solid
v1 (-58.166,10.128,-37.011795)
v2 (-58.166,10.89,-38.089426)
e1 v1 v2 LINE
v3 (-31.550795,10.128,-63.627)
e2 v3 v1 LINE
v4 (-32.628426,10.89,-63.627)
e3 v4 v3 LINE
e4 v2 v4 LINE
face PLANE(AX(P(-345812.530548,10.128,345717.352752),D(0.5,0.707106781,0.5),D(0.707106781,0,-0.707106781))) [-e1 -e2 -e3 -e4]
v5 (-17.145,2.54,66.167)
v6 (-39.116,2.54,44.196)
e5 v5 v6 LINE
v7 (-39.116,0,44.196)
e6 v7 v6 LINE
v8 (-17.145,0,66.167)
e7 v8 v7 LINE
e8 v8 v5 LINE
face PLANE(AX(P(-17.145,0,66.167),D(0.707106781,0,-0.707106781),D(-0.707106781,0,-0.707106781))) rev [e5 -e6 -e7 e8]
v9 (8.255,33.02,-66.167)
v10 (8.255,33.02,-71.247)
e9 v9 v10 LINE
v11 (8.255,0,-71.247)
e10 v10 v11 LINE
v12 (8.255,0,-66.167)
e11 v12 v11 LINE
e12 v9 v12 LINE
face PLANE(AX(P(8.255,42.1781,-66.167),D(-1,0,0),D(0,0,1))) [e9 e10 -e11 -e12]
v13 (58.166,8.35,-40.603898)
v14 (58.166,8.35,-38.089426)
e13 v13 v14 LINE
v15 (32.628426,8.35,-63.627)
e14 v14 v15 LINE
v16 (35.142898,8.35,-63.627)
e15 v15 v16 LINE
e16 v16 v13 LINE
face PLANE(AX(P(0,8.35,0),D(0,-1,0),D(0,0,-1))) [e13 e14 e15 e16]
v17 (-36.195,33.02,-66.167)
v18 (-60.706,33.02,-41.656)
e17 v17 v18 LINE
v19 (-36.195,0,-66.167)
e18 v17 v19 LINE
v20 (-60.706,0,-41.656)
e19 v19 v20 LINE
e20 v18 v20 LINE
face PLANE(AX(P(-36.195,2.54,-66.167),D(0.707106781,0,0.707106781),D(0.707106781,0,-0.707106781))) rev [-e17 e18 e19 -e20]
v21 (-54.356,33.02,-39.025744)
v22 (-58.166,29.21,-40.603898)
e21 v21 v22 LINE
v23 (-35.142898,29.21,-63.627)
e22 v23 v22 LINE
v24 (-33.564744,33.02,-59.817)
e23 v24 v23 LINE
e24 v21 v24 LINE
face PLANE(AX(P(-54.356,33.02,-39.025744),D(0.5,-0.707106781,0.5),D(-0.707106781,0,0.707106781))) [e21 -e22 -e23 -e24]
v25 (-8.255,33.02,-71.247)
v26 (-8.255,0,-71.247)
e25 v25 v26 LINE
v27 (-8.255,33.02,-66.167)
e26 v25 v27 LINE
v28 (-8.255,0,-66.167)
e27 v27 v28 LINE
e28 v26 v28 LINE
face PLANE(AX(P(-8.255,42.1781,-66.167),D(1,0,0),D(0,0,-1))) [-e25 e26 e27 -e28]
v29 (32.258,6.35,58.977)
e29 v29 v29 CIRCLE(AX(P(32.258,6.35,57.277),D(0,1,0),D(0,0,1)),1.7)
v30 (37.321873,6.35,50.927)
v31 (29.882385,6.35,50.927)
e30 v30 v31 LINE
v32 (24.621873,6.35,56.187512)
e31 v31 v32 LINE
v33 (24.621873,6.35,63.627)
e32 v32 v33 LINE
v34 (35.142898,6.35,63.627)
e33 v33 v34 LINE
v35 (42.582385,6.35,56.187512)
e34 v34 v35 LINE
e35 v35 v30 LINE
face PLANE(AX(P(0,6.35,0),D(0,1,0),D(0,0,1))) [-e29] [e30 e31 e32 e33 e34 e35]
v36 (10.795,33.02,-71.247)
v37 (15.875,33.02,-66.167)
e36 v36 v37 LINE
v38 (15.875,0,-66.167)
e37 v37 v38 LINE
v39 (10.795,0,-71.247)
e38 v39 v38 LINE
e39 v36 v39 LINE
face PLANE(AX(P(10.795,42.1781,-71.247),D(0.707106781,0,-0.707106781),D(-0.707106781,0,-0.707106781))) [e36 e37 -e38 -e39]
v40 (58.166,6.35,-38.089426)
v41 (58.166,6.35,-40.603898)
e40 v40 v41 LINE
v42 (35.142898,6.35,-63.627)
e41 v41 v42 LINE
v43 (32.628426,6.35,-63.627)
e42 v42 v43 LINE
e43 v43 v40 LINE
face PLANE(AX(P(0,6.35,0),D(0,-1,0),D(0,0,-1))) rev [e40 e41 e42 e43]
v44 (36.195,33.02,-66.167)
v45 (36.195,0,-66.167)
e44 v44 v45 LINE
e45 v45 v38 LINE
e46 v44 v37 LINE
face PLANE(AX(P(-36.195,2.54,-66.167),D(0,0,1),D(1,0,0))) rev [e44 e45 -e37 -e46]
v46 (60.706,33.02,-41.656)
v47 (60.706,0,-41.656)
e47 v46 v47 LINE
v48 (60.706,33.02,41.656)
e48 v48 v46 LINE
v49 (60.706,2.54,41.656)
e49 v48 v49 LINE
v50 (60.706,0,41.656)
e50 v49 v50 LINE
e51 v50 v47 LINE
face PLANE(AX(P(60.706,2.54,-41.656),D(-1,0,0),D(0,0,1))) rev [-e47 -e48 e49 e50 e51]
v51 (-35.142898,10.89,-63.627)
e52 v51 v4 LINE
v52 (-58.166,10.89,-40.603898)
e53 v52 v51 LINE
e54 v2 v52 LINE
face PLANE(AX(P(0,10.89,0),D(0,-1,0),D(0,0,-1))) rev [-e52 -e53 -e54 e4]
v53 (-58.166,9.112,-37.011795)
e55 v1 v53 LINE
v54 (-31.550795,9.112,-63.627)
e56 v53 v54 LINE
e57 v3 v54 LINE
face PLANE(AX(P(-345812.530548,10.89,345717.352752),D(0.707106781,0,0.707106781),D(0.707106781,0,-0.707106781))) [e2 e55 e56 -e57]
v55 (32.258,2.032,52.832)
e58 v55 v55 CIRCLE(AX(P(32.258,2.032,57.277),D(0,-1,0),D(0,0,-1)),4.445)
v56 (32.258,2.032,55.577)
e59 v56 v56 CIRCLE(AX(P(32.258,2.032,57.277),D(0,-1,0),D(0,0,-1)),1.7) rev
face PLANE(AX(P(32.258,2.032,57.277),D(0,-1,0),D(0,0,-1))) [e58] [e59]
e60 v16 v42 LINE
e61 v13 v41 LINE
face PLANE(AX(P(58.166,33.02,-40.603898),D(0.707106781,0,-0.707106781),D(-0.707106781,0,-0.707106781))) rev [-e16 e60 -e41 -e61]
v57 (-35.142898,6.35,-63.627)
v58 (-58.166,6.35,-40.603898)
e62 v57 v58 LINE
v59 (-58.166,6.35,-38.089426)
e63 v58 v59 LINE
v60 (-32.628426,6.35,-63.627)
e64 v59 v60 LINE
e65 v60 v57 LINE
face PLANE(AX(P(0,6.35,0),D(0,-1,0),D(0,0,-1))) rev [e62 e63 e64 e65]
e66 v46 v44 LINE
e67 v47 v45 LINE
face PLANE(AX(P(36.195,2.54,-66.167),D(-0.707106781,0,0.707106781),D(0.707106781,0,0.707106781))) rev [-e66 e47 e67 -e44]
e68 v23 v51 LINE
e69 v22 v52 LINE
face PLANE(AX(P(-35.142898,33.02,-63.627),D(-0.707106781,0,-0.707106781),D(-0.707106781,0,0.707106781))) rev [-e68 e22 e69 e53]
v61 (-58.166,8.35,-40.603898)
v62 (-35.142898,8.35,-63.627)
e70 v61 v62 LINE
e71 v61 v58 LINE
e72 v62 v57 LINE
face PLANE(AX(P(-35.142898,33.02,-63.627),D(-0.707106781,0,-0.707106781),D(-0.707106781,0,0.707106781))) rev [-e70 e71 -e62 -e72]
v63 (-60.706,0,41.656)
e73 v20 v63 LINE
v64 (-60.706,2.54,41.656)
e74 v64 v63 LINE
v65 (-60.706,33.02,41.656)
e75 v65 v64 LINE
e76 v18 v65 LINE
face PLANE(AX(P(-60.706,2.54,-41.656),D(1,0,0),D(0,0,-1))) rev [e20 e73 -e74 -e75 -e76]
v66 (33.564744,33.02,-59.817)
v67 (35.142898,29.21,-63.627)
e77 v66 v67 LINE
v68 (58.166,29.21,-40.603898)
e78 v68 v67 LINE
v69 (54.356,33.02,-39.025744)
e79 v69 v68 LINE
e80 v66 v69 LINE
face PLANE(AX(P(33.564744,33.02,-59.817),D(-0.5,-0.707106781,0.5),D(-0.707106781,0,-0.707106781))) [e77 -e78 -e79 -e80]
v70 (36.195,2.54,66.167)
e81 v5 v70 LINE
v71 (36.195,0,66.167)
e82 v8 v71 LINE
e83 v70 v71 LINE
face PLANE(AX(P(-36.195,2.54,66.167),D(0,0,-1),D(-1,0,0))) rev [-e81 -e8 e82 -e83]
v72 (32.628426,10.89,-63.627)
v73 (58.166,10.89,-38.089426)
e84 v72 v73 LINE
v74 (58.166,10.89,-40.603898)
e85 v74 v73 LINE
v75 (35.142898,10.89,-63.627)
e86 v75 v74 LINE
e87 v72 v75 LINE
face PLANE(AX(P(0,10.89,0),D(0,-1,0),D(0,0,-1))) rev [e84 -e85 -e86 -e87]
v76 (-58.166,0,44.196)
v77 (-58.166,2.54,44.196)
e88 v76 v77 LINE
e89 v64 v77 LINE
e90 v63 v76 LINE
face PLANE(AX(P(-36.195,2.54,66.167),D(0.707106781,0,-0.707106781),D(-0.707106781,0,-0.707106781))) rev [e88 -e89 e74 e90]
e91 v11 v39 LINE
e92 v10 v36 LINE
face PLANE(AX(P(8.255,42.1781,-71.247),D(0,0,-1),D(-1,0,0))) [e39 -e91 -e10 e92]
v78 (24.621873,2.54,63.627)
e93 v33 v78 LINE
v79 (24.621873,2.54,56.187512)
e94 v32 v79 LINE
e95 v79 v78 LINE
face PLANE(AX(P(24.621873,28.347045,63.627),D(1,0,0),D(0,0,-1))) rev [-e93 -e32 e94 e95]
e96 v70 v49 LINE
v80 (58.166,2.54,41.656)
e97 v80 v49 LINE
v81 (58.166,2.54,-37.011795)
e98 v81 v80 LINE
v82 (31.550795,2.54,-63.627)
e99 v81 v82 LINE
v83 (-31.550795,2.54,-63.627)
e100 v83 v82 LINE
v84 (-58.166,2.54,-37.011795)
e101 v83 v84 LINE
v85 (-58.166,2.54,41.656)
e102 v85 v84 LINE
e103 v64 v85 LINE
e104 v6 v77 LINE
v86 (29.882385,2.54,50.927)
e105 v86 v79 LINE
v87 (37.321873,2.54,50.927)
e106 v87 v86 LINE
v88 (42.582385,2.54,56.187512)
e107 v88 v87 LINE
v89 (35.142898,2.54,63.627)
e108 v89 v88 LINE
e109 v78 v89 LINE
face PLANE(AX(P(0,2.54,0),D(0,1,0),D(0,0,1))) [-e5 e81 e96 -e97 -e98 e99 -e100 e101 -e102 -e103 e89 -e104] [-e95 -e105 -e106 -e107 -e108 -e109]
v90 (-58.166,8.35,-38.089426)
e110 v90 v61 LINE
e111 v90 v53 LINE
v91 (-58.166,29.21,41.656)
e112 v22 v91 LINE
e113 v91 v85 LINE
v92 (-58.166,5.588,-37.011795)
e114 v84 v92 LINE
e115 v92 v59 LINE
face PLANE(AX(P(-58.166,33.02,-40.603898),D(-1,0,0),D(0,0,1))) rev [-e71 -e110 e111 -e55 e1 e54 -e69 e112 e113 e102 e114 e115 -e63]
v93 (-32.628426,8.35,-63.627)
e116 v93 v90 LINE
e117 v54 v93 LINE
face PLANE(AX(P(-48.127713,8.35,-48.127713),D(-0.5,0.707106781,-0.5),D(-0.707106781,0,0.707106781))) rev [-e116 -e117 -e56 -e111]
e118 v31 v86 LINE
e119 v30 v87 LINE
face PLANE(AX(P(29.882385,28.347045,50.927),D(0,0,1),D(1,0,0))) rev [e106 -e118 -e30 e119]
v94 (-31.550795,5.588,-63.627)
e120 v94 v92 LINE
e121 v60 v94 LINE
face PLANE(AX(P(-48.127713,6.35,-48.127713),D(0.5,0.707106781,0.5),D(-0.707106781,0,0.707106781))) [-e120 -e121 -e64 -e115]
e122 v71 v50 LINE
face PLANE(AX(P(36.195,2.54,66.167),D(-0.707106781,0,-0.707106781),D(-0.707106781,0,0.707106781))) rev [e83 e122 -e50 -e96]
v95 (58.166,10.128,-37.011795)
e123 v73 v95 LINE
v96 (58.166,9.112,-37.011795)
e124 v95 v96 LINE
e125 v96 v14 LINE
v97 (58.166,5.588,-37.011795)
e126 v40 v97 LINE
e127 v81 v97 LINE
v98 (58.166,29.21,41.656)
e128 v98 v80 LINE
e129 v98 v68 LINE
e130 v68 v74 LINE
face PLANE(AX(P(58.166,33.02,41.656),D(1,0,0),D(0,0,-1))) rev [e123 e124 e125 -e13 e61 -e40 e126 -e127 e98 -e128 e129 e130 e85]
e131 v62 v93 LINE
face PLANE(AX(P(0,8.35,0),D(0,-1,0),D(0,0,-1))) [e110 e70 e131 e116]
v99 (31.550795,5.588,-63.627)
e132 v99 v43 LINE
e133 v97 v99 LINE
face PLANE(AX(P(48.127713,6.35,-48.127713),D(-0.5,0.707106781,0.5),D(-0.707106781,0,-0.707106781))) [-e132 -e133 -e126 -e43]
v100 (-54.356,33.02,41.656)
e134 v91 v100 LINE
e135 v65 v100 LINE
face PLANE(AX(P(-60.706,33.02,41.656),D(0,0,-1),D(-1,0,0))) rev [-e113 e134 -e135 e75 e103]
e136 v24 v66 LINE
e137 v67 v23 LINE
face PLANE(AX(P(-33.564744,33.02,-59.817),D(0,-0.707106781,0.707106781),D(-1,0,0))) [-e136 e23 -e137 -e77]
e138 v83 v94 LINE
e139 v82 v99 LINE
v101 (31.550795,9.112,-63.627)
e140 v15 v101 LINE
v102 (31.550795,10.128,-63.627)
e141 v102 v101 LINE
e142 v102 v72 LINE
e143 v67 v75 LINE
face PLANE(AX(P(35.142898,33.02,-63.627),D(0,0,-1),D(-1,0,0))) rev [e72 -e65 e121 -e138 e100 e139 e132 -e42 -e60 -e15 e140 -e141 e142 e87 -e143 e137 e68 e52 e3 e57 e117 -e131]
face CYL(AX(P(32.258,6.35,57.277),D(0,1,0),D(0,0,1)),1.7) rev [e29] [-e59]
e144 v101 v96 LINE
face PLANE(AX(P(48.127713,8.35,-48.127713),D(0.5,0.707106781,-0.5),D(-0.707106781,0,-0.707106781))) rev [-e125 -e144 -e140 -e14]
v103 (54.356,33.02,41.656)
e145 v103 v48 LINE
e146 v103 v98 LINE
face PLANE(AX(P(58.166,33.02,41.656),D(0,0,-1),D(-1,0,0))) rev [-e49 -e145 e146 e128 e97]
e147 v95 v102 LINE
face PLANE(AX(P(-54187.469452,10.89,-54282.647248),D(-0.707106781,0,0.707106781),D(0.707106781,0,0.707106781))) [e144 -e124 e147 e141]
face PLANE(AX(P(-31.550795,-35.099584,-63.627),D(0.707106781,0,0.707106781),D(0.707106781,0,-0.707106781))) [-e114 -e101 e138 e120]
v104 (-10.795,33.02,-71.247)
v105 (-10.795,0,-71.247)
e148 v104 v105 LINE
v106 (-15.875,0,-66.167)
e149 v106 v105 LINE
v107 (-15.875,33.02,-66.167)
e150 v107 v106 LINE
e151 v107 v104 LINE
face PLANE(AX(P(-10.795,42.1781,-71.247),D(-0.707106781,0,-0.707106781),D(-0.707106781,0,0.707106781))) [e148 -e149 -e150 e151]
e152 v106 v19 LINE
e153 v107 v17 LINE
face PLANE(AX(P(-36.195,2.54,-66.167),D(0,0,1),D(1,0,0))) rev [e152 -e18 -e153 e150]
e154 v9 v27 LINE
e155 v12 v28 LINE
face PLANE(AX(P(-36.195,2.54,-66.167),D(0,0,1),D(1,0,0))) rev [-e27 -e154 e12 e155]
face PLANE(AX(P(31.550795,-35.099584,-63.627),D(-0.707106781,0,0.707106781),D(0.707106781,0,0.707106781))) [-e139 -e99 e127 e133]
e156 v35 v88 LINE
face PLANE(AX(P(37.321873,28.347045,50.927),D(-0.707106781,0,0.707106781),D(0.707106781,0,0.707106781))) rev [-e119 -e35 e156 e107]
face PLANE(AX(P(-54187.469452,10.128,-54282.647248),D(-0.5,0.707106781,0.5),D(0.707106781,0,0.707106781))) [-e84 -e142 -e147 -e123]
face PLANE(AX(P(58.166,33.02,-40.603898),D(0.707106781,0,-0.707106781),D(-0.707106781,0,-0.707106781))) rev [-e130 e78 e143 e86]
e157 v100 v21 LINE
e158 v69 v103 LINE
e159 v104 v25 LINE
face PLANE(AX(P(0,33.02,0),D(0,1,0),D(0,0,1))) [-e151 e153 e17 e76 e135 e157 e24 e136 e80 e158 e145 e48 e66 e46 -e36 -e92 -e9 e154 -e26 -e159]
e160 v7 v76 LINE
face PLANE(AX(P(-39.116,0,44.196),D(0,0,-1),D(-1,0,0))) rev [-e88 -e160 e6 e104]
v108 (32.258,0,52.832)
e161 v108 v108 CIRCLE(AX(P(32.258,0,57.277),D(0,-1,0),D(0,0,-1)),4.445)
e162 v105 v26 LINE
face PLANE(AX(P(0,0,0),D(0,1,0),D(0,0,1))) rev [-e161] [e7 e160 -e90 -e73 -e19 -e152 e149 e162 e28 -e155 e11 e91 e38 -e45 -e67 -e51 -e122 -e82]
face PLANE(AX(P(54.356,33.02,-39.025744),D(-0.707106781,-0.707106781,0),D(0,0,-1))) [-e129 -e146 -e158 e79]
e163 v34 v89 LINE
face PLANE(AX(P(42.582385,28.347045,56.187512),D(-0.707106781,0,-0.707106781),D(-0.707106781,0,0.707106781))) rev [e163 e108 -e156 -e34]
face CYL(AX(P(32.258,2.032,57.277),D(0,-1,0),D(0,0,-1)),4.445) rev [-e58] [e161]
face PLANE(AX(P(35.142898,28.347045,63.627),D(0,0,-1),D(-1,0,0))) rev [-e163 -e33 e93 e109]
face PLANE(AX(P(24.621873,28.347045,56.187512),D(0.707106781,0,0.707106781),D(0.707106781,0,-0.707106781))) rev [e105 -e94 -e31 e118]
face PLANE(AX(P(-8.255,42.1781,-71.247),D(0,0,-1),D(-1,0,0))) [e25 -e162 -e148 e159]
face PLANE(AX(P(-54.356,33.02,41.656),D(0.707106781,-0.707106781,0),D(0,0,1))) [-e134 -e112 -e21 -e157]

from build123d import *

# Parameters (mm, degrees)
BOSS_EXTRUDE1_DEPTH  = 2.54
BOSS_EXTRUDE2_DEPTH  = 30.48
CUT_EXTRUDE2_DEPTH   = 95.827847835
BOSS_EXTRUDE4_DEPTH  = 3.81
BOSS_EXTRUDE5_START  = 2
BOSS_EXTRUDE5_DEPTH  = 2.54
CHAMFER4_SIZE        = 0.762
BOSS_EXTRUDE6_DEPTH  = 3.81
M3_CLEARANCE_HOLE1_D = 3.4
SKETCH13_R           = 4.445
CUT_EXTRUDE3_DEPTH   = 2.032
BOSS_EXTRUDE3_DEPTH  = 3.81
CHAMFER2_SIZE        = 3.81
BOSS_EXTRUDE10_DEPTH = 33.02


with BuildPart() as part:
    # Sketch1 → Boss-Extrude1 (new body)
    with BuildSketch(Plane(origin=(0, 0, 0), x_dir=(1, 0, 0), z_dir=(0, 1, 0))):
        Polygon((-36.195, 66.167), (36.195, 66.167), (60.706, 41.656), (60.706, -41.656), (36.195, -66.167), (-36.195, -66.167), (-60.706, -41.656), (-60.706, 41.656), align=None)
    extrude(amount=BOSS_EXTRUDE1_DEPTH)

    # Sketch5 → Boss-Extrude2 (add)
    with BuildSketch(Plane(origin=(0, 2.54, 0), x_dir=(1, 0, 0), z_dir=(0, 1, 0))):
        Polygon((60.706, -41.656), (60.706, 41.656), (36.195, 66.167), (-36.195, 66.167), (-60.706, 41.656), (-60.706, -41.656), (-58.166, -41.656), (-58.166, 40.603897552), (-35.142897552, 63.627), (35.142897552, 63.627), (58.166, 40.603897552), (58.166, -41.656), align=None)
    extrude(amount=BOSS_EXTRUDE2_DEPTH)

    # Sketch8 → Cut-Extrude2 (cut, through all)
    with BuildSketch(Plane(origin=(0, 2.54, 0), x_dir=(1, 0, 0), z_dir=(0, 1, 0))):
        Polygon((-58.166, -44.196), (-36.195, -66.167), (-17.145, -66.167), (-39.116, -44.196), align=None)
    extrude(amount=-CUT_EXTRUDE2_DEPTH, mode=Mode.SUBTRACT)

    # Sketch9 → Boss-Extrude4 (add)
    with BuildSketch(Plane(origin=(0, 6.35, 0), x_dir=(1, 0, 0), z_dir=(0, 1, 0))):
        Polygon((-58.166, 40.603897552), (-35.142897552, 63.627), (-31.550795103, 63.627), (-58.166, 37.011795103), align=None)
        Polygon((31.550795103, 63.627), (58.166, 37.011795103), (58.166, 40.603897552), (35.142897552, 63.627), align=None)
    extrude(amount=-BOSS_EXTRUDE4_DEPTH)

    # Sketch9<3> → Boss-Extrude5 (add)
    with BuildSketch(Plane(origin=(0, 6.35, 0), x_dir=(1, 0, 0), z_dir=(0, 1, 0)).offset(BOSS_EXTRUDE5_START)):
        Polygon((-58.166, 40.603897552), (-35.142897552, 63.627), (-31.550795103, 63.627), (-58.166, 37.011795103), align=None)
        Polygon((31.550795103, 63.627), (58.166, 37.011795103), (58.166, 40.603897552), (35.142897552, 63.627), align=None)
    extrude(amount=BOSS_EXTRUDE5_DEPTH)

    # Chamfer4
    chamfer4_edges = [part.edges().sort_by_distance(p)[0] for p in [
        (-44.858397552, 10.89, -50.319397552),
        (-44.858397552, 8.35, -50.319397552),
        (44.858397552, 10.89, -50.319397552),
        (44.858397552, 8.35, -50.319397552),
        (-44.858397552, 6.35, -50.319397552),
        (44.858397552, 6.35, -50.319397552),
    ]]
    chamfer(chamfer4_edges, length=CHAMFER4_SIZE)

    # Sketch10 → Boss-Extrude6 (add)
    with BuildSketch(Plane(origin=(0, 2.54, 0), x_dir=(1, 0, 0), z_dir=(0, 1, 0))):
        Polygon((42.582385309, -56.187512242), (35.142897552, -63.627), (24.621873067, -63.627), (24.621873067, -56.187512242), (29.882385309, -50.927), (37.321873067, -50.927), align=None)
    extrude(amount=BOSS_EXTRUDE6_DEPTH)

    # M3 Clearance Hole1 (through all)
    with Locations(Plane(origin=(0, 6.35, 0), x_dir=(1, 0, 0), z_dir=(0, 1, 0))):
        with Locations((32.258, -57.277)):
            Hole(M3_CLEARANCE_HOLE1_D / 2)

    # Sketch13 → Cut-Extrude3 (cut)
    with BuildSketch(Plane.XZ):
        with Locations(Location((32.258, 57.277, 0), (0, 0, 270))):
            Circle(SKETCH13_R)
    extrude(amount=-CUT_EXTRUDE3_DEPTH, mode=Mode.SUBTRACT)

    # Sketch7 → Boss-Extrude3 (add)
    with BuildSketch(Plane(origin=(0, 33.02, 0), x_dir=(1, 0, 0), z_dir=(0, 1, 0))):
        Polygon((-58.166, -41.656), (-54.356, -41.656), (-54.356, 39.025743879), (-33.564743879, 59.817), (33.564743879, 59.817), (54.356, 39.025743879), (54.356, -41.656), (58.166, -41.656), (58.166, 40.603897552), (35.142897552, 63.627), (-35.142897552, 63.627), (-58.166, 40.603897552), align=None)
    extrude(amount=-BOSS_EXTRUDE3_DEPTH)

    # Chamfer2
    chamfer2_edges = [part.edges().sort_by_distance(p)[0] for p in [
        (54.356, 29.21, 1.315128061),
        (43.960371939, 29.21, -49.421371939),
        (0, 29.21, -59.817),
        (-43.960371939, 29.21, -49.421371939),
        (-54.356, 29.21, 1.315128061),
    ]]
    chamfer(chamfer2_edges, length=CHAMFER2_SIZE - 0.0001)  # a hair under: the kernel refuses the full size

    # Sketch14 → Boss-Extrude10 (add)
    with BuildSketch(Plane.XZ):
        Polygon((-8.255, -66.167), (-8.255, -71.247), (-10.795, -71.247), (-15.875, -66.167), align=None)
        Polygon((10.795, -71.247), (15.875, -66.167), (8.255, -66.167), (8.255, -71.247), align=None)
    extrude(amount=-BOSS_EXTRUDE10_DEPTH)


solid = part.part
